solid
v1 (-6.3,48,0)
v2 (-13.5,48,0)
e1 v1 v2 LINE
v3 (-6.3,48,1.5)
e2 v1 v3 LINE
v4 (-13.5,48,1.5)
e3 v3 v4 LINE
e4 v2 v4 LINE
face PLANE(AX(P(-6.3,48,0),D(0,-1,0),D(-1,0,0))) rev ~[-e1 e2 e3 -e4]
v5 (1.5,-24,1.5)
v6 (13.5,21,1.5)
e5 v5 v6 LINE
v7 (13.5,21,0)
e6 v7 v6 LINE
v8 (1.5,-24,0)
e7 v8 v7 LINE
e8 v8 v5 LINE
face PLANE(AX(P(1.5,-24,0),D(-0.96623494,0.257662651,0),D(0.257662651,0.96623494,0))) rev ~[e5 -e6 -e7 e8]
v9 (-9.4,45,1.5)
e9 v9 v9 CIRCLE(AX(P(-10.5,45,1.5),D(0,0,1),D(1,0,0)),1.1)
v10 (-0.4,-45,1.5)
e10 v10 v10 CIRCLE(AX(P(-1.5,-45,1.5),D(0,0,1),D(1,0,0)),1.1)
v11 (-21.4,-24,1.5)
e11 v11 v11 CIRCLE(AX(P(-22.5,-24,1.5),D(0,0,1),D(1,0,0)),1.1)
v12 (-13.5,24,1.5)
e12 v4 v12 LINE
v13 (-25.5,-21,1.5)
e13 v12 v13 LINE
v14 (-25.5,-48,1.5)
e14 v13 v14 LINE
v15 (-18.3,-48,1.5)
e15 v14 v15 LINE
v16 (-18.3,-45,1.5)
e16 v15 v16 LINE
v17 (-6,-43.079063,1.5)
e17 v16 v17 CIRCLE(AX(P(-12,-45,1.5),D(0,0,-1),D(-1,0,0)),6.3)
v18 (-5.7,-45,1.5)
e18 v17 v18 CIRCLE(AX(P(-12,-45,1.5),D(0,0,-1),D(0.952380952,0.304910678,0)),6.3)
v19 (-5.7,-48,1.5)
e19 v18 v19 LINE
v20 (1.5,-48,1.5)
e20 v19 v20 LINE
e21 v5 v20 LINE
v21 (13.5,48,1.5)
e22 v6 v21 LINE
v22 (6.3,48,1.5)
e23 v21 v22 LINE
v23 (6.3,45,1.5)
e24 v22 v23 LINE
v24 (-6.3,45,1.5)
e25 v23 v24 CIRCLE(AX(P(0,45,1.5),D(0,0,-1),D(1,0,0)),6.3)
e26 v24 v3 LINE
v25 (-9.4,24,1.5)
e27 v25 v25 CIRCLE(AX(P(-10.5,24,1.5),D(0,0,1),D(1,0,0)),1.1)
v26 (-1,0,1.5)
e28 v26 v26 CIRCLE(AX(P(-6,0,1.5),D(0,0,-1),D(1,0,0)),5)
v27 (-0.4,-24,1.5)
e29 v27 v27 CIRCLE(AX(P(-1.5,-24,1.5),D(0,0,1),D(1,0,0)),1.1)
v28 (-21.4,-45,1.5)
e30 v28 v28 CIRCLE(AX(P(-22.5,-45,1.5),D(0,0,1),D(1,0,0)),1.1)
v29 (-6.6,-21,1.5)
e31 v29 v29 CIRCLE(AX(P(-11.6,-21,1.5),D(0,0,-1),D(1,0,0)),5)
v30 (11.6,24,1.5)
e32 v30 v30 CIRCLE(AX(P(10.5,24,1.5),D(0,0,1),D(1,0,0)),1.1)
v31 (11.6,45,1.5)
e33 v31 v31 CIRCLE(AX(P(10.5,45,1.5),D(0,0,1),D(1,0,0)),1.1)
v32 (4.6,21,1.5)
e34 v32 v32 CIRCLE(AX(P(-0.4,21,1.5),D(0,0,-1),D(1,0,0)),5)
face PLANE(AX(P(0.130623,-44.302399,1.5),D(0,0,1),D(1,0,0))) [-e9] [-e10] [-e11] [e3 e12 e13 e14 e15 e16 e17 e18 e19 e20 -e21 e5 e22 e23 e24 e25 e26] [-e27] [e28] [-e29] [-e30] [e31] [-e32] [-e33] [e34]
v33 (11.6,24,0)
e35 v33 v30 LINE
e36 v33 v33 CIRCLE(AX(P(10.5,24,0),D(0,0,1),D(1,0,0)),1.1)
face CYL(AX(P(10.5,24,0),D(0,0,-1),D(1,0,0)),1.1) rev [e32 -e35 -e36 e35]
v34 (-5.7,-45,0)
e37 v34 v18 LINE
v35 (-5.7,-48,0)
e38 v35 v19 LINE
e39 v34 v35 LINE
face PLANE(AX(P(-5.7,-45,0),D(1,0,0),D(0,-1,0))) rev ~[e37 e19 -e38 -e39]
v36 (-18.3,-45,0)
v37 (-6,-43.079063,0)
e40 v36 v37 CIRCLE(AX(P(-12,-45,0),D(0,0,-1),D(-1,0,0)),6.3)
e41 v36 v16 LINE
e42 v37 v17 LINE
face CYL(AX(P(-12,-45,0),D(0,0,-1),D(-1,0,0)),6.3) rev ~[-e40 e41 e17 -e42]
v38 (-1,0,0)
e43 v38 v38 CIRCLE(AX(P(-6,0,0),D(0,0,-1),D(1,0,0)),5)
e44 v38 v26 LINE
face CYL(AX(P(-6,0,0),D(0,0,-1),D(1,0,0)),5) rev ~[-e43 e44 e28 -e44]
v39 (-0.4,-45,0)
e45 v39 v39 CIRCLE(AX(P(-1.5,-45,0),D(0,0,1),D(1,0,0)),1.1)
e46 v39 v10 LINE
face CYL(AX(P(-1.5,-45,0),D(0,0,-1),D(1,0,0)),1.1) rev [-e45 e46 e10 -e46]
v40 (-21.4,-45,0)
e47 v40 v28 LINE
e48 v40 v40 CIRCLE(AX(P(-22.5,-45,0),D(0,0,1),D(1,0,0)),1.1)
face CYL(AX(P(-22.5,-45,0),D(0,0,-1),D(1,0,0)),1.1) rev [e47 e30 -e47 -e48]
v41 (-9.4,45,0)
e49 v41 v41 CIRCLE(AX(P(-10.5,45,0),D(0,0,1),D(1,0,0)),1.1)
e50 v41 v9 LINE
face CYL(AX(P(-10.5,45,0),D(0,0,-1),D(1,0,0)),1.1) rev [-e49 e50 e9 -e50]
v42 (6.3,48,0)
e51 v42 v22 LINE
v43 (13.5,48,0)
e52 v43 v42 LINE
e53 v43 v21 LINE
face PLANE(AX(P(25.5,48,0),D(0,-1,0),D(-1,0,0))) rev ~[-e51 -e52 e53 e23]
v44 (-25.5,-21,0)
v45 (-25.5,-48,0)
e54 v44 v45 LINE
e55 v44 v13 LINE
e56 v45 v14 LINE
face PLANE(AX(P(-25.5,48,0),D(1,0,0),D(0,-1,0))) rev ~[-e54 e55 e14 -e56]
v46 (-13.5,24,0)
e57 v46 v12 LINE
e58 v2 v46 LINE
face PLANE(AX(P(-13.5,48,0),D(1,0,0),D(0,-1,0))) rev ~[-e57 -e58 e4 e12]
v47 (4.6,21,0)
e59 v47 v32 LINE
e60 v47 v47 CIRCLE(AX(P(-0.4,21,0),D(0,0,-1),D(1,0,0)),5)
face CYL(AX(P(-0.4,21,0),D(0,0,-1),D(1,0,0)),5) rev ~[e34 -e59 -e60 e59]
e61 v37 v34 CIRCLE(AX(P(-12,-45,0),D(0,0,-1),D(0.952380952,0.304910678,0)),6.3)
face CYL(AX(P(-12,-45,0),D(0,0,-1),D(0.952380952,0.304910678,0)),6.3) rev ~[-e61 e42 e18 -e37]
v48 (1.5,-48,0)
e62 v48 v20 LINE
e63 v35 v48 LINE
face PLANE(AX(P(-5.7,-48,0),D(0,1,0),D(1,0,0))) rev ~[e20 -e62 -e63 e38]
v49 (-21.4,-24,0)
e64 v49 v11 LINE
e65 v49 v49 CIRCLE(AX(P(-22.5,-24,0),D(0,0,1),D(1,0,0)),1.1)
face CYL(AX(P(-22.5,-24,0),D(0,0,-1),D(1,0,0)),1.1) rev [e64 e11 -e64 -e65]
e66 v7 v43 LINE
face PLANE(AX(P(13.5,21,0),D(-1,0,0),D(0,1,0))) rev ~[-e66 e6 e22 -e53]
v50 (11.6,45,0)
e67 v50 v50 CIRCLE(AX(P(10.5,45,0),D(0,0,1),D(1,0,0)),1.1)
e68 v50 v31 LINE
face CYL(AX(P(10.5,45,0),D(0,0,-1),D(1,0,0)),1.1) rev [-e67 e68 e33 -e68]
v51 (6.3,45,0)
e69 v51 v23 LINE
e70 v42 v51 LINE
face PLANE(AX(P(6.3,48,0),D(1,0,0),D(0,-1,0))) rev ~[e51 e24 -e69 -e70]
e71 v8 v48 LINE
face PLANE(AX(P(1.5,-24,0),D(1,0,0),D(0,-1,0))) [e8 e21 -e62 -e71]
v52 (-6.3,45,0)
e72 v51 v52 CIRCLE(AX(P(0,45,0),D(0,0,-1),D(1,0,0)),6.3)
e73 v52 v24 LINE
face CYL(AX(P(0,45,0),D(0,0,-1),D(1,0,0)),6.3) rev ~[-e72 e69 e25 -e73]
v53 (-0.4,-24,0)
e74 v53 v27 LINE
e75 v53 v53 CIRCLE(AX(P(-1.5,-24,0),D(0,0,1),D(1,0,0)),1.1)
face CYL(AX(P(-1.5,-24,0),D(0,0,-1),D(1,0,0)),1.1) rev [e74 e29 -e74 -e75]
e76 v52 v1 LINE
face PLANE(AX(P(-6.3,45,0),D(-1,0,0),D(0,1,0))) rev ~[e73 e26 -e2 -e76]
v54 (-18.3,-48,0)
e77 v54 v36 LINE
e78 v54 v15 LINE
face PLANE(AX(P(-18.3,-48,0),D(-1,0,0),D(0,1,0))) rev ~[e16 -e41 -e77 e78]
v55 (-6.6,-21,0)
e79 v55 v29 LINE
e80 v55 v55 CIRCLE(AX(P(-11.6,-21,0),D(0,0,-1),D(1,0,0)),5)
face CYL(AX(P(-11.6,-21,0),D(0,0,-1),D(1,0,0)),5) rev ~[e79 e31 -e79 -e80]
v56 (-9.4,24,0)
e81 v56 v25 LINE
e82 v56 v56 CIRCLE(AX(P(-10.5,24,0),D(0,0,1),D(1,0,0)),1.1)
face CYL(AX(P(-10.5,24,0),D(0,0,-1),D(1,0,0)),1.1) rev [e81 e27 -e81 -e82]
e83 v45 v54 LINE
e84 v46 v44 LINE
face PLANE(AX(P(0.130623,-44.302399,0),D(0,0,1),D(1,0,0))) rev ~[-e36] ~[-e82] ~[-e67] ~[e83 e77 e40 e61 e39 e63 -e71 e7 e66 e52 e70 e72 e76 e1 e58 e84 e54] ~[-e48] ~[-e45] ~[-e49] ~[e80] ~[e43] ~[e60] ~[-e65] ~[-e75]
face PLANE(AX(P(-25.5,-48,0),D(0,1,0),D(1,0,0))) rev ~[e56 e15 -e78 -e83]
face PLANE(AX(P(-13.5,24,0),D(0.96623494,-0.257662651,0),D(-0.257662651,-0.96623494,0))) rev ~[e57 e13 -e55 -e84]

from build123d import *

# Parameters (mm, degrees)
F0_R     = 1.1
F1_DEPTH = 1.5
F2_W     = 12
F2_H     = 24
F3_DEPTH = 1.5
F4_R     = 5
F5_DEPTH = 1.5


# Not quite as in the source:
# - a feature names something its author has since deleted; it is built from what else it names


with BuildPart() as f1:
    # F0 (on Top) → F1 (new body)
    with BuildSketch(Plane.XY):
        with BuildLine():
            Line((-5.7, -48), (6.3, -48))
            Line((6.3, -48), (6.3, -45))
            ThreePointArc((6.3, -45), (0.9721111048, -38.7754518236), (-6, -43.0790627288))
            ThreePointArc((-6, -43.0790627288), (-5.7754518236, -44.0278888952), (-5.7, -45))
            Line((-5.7, -45), (-5.7, -48))
        make_face()
        with Locations((-1.5, -45)):
            Circle(F0_R, mode=Mode.SUBTRACT)
        with BuildLine():
            Line((25.5, -48), (25.5, 48))
            Line((25.5, 48), (6.3, 48))
            Line((6.3, 48), (6.3, 45))
            ThreePointArc((6.3, 45), (0, 38.7), (-6.3, 45))
            Line((-6.3, 45), (-6.3, 48))
            Line((-6.3, 48), (-25.5, 48))
            Line((-25.5, 48), (-25.5, -48))
            Line((-25.5, -48), (-18.3, -48))
            Line((-18.3, -48), (-18.3, -45))
            ThreePointArc((-18.3, -45), (-12.9721111048, -38.7754518236), (-6, -43.0790627288))
            ThreePointArc((-6, -43.0790627288), (0.9721111048, -38.7754518236), (6.3, -45))
            Line((6.3, -45), (6.3, -48))
            Line((6.3, -48), (25.5, -48))
        make_face()
        with Locations((-22.5, -45)):
            Circle(F0_R, mode=Mode.SUBTRACT)
        with Locations((-22.5, -24)):
            Circle(F0_R, mode=Mode.SUBTRACT)
        with Locations((-10.5, -24)):
            Circle(F0_R, mode=Mode.SUBTRACT)
        with Locations((-1.5, -24)):
            Circle(F0_R, mode=Mode.SUBTRACT)
        with Locations((10.5, -45)):
            Circle(F0_R, mode=Mode.SUBTRACT)
        with Locations((10.5, -24)):
            Circle(F0_R, mode=Mode.SUBTRACT)
        with Locations((-10.5, 24)):
            Circle(F0_R, mode=Mode.SUBTRACT)
        with Locations((-10.5, 45)):
            Circle(F0_R, mode=Mode.SUBTRACT)
        with Locations((10.5, 24)):
            Circle(F0_R, mode=Mode.SUBTRACT)
        with Locations((10.5, 45)):
            Circle(F0_R, mode=Mode.SUBTRACT)
        with Locations((-10.5, -24)):
            Circle(F0_R)
        with Locations((10.5, -45)):
            Circle(F0_R)
        with Locations((10.5, -24)):
            Circle(F0_R)
    extrude(amount=F1_DEPTH)

    # F2 (on face) → F3 (cut, through all)
    with BuildSketch(Plane(origin=(0, 0, 0), x_dir=(1, 0, 0), z_dir=(0, 0, -1))):
        Polygon((-13.5, -24), (-25.5, 21), (-25.5, -24), align=None)
        Polygon((25.5, 48), (13.5, 48), (13.5, 24), (13.5, -21), (13.5, -48), (25.5, -48), align=None)
        with Locations((-19.5, -36)):
            Rectangle(F2_W, F2_H)
        with Locations((7.5, 36)):
            Rectangle(F2_W, F2_H)
        Polygon((13.5, 24), (1.5, 24), (13.5, -21), align=None)
    extrude(amount=-F3_DEPTH, mode=Mode.SUBTRACT)

    # F4 (on face) → F5 (cut, through all)
    with BuildSketch(Plane(origin=(0, 0, 0), x_dir=(1, 0, 0), z_dir=(0, 0, -1))):
        with Locations((-0.4, -21)):
            Circle(F4_R)
        with Locations((-11.6, 21)):
            Circle(F4_R)
        with Locations((-6, 0)):
            Circle(F4_R)
    extrude(amount=-F5_DEPTH, mode=Mode.SUBTRACT)


solid = f1.part
